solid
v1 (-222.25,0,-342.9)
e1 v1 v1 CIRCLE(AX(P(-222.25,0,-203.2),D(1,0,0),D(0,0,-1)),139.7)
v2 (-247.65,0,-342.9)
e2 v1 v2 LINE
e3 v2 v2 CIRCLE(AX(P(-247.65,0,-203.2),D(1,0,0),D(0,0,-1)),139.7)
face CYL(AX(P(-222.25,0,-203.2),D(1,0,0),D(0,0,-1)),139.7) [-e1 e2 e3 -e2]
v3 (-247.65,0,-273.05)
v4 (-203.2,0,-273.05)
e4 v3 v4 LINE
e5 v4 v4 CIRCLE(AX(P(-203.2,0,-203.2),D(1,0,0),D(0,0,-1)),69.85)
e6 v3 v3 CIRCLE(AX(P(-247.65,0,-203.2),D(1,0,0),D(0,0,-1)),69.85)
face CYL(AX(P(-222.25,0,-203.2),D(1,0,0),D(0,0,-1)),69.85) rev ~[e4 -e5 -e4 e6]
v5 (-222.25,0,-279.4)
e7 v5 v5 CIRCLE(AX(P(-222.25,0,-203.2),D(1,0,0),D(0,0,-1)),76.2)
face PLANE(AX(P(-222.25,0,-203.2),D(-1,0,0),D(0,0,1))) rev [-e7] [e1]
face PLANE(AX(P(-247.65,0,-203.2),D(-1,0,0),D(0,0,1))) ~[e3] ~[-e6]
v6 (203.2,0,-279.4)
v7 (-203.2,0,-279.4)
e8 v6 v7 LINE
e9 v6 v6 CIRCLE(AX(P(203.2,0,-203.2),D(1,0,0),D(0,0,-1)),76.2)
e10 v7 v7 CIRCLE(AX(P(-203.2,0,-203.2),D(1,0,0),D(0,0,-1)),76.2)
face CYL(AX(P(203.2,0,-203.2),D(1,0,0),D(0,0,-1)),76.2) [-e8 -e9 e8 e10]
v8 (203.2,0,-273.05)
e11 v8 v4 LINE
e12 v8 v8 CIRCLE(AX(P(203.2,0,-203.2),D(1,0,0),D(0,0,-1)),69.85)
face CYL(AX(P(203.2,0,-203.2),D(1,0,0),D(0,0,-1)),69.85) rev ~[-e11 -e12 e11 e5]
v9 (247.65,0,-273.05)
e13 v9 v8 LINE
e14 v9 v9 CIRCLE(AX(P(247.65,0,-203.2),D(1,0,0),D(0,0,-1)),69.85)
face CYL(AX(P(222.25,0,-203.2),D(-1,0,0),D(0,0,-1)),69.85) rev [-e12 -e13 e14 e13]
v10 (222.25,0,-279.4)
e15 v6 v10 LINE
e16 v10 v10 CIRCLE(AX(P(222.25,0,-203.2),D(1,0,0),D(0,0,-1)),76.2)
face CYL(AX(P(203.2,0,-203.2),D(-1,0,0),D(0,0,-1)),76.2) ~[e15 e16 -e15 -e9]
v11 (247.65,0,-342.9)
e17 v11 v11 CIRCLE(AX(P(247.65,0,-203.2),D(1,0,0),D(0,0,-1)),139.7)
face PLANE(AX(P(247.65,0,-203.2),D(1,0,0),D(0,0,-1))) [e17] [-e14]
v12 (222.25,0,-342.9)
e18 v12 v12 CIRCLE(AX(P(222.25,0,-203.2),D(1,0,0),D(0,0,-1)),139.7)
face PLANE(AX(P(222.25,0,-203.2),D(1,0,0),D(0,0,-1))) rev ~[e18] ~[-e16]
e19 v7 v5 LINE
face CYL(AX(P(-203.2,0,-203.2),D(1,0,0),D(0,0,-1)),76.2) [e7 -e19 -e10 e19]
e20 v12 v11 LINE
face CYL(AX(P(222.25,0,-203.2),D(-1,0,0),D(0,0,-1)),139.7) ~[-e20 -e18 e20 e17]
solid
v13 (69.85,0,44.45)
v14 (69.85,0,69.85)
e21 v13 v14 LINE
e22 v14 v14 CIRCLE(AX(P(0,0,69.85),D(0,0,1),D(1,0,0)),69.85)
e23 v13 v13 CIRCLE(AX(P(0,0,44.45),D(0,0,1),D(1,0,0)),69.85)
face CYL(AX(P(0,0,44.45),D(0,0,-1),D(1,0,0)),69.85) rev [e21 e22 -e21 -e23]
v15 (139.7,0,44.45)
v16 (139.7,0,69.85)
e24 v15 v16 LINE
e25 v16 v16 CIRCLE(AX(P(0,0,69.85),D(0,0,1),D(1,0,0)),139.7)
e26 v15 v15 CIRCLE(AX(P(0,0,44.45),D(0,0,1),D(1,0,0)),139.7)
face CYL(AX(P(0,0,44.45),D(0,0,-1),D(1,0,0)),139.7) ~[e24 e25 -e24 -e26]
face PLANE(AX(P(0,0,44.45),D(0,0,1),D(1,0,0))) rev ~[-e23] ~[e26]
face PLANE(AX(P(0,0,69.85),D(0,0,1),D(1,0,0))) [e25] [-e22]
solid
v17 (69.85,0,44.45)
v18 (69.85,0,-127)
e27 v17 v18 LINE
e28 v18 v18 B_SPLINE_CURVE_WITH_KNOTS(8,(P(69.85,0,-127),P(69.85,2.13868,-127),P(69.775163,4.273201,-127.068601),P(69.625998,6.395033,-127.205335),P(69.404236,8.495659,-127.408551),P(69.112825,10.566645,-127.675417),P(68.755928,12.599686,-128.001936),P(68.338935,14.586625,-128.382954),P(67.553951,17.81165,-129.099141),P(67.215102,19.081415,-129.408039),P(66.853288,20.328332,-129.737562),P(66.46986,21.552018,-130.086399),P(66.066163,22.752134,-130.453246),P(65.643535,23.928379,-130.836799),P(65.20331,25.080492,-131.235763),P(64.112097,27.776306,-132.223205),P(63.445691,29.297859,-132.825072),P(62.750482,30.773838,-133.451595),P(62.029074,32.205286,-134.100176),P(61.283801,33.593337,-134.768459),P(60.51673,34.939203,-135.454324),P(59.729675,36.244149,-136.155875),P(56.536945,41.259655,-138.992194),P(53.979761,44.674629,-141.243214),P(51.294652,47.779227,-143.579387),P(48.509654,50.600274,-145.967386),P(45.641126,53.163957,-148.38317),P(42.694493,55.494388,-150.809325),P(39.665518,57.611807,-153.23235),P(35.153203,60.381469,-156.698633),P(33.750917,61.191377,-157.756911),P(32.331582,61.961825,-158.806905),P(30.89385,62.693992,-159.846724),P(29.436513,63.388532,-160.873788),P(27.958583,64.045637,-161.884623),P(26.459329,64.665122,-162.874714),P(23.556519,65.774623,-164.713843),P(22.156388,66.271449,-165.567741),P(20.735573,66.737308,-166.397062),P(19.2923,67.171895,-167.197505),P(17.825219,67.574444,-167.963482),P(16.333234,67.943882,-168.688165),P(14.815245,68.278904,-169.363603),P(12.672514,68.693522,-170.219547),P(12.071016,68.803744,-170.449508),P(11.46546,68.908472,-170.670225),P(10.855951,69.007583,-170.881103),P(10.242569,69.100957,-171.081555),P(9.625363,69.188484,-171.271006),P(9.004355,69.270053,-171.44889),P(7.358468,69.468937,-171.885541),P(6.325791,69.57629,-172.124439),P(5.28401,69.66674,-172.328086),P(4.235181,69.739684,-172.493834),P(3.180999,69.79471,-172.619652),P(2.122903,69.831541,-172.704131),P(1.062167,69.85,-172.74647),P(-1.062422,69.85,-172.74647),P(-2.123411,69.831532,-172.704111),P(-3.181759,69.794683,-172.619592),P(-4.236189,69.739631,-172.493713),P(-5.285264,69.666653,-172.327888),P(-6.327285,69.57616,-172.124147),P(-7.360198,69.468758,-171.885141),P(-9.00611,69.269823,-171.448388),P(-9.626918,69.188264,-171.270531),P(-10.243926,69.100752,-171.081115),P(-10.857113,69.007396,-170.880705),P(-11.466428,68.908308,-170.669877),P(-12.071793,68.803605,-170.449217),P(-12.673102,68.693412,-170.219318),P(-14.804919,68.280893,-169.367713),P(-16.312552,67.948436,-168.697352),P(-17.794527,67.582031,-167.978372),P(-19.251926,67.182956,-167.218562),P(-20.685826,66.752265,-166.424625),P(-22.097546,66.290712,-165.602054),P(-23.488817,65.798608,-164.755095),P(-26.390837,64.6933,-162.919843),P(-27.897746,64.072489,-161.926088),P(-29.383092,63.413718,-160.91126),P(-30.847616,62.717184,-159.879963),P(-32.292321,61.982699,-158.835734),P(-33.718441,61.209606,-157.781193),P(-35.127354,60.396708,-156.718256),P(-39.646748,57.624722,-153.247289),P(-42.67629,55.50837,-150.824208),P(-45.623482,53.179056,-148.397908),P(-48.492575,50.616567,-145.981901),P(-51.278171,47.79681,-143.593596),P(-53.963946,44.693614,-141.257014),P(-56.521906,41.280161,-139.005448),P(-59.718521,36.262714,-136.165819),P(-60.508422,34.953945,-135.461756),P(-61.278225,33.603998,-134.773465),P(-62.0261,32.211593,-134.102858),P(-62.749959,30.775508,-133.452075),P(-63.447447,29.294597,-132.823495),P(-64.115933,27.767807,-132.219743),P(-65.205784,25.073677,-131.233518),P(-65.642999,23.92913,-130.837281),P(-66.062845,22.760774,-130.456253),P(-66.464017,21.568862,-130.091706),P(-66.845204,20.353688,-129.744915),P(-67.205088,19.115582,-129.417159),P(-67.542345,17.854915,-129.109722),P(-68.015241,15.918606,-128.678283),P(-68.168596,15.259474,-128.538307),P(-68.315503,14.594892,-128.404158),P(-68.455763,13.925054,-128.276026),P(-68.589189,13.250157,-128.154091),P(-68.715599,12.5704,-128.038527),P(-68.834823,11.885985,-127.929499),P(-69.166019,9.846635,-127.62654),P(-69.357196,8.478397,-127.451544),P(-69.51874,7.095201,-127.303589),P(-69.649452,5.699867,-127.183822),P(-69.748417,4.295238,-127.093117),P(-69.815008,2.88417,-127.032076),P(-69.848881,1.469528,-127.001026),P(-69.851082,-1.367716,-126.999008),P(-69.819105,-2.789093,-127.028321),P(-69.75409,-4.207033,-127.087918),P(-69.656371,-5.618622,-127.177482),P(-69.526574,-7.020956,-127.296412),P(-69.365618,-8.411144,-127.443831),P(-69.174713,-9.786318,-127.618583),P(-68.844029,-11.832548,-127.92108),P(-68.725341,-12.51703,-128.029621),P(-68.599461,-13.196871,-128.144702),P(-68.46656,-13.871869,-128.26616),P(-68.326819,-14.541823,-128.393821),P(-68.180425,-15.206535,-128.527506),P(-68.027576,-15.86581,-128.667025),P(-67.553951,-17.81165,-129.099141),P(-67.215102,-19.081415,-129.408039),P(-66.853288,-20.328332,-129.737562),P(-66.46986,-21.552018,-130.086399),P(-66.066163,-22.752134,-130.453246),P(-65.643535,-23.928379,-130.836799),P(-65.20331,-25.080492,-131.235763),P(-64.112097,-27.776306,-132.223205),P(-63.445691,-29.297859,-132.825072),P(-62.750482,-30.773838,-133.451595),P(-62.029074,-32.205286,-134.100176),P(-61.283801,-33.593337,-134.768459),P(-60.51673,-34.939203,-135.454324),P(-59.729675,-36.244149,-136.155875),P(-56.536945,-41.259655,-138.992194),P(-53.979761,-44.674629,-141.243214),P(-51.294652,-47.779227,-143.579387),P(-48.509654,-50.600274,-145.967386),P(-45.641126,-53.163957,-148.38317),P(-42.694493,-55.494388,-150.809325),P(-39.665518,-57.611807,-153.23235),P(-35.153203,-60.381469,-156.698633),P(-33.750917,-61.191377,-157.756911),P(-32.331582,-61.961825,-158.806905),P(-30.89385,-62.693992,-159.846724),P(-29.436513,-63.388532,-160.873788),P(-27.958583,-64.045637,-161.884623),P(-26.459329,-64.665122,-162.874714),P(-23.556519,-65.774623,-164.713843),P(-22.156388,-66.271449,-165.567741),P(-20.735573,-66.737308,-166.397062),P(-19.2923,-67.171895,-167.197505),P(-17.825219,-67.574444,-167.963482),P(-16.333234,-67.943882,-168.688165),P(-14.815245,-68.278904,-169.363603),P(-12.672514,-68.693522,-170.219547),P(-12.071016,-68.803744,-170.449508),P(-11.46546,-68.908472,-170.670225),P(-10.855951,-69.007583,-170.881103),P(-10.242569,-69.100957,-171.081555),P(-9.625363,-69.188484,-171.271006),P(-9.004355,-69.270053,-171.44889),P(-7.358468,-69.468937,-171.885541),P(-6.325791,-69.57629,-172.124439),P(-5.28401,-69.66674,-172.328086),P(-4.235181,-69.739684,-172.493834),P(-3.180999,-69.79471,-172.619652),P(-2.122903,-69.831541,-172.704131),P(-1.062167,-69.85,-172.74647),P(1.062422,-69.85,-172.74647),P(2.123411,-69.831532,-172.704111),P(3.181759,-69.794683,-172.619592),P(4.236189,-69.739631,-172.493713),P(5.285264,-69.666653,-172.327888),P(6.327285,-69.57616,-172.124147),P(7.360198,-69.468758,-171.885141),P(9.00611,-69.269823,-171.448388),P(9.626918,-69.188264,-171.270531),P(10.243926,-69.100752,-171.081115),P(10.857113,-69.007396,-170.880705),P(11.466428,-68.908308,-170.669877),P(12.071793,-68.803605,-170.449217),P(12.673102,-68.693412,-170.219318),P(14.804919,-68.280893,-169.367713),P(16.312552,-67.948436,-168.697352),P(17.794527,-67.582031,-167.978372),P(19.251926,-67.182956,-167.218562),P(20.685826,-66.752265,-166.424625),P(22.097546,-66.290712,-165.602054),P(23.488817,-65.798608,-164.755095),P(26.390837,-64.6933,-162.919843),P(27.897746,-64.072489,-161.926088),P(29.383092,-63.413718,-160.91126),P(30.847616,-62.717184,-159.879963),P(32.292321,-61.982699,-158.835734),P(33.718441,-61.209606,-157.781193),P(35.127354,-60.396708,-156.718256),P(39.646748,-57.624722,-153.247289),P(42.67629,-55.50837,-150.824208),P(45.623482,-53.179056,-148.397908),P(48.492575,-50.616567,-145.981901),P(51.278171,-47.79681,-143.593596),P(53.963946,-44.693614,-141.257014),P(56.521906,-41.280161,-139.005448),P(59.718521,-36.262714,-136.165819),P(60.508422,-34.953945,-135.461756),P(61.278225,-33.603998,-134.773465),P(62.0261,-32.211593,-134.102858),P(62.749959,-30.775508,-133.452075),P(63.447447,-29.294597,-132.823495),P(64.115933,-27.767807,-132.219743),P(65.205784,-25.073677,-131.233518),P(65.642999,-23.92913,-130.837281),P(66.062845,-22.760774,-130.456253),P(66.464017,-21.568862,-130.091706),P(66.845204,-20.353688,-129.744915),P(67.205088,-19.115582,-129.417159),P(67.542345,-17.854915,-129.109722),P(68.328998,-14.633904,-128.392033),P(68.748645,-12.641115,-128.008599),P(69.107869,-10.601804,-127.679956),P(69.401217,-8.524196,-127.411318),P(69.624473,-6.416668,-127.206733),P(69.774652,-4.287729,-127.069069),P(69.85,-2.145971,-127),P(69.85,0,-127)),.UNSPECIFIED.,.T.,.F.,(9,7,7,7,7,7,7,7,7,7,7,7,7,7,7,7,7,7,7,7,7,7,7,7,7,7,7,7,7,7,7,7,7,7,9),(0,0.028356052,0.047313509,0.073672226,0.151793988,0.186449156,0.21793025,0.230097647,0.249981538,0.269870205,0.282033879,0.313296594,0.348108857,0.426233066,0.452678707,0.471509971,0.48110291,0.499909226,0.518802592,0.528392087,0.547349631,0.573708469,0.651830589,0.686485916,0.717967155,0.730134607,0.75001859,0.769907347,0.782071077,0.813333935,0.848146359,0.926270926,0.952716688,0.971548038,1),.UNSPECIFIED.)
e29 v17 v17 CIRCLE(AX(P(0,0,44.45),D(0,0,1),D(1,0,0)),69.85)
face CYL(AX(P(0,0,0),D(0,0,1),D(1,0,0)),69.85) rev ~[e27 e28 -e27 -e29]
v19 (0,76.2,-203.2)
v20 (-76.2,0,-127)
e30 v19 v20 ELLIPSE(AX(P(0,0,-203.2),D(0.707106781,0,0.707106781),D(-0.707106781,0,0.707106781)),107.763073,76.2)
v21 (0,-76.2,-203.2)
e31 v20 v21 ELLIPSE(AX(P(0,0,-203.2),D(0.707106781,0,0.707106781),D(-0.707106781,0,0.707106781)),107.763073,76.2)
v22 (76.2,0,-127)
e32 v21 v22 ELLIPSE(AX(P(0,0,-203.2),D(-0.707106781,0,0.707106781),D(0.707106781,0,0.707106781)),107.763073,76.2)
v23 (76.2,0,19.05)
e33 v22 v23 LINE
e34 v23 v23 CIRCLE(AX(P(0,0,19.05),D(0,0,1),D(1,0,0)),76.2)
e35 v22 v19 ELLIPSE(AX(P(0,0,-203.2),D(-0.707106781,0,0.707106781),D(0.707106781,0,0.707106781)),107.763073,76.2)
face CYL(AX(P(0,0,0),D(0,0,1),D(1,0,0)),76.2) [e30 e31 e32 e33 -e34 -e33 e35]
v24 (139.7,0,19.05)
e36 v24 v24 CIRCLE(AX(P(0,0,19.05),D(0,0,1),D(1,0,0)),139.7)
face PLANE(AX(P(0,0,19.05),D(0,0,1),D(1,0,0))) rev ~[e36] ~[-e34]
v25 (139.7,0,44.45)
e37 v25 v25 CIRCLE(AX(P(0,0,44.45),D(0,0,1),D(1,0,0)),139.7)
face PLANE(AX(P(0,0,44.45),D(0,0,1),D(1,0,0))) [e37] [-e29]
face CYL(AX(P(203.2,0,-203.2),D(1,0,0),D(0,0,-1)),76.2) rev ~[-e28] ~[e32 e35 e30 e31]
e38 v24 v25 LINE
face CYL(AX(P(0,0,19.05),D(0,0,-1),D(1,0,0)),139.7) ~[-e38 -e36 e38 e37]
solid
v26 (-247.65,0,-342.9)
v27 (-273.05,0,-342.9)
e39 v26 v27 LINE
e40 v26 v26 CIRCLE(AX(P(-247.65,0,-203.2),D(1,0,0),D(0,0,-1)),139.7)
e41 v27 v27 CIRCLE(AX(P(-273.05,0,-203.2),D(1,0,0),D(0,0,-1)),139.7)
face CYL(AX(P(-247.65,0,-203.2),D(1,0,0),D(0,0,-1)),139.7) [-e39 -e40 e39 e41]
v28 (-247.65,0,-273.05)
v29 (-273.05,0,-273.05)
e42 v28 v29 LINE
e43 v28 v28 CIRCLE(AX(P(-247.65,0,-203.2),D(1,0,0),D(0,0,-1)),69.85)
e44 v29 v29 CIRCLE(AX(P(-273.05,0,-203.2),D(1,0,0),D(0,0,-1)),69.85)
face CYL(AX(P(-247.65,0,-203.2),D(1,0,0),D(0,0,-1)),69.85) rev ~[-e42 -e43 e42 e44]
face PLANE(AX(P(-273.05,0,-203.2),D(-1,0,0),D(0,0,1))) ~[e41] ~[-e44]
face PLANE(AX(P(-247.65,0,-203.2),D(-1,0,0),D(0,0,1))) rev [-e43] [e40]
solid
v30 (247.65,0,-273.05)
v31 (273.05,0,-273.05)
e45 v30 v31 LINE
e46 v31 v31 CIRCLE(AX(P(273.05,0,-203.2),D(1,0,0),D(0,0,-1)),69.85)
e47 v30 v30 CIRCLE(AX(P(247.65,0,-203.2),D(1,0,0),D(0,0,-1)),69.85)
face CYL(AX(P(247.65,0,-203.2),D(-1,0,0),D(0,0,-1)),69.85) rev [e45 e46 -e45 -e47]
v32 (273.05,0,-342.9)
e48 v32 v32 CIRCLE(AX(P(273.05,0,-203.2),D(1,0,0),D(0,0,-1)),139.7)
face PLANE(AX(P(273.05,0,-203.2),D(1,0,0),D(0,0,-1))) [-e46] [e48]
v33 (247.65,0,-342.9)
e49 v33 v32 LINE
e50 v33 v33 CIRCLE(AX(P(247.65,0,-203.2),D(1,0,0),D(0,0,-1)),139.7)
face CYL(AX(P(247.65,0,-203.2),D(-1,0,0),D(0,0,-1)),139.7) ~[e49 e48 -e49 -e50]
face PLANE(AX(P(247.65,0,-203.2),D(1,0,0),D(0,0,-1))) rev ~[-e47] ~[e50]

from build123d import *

# Parameters (mm, degrees)
F0_R      = 76.2
F0_R_2    = 69.85
F1_DEPTH  = 19.05
F2_R      = 139.7
F2_R_2    = 76.2
F2_R_3    = 69.85
F3_DEPTH  = 25.4
F9_ANGLE  = 90
F11_DEPTH = 406.4
F12_REACH = 558.4271469057
F13_DEPTH = 25.4
F14_DEPTH = 25.4
F15_DEPTH = 25.4


with BuildPart() as f1:
    # F0 (on Top) → F1 (new body)
    with BuildSketch(Plane.XY):
        Circle(F0_R)
        Circle(F0_R_2, mode=Mode.SUBTRACT)
    extrude(amount=F1_DEPTH)

    # F2 (on face) → F3 (join)
    with BuildSketch(Plane.XY.offset(19.05)):
        Circle(F2_R)
        Circle(F2_R_2, mode=Mode.SUBTRACT)
        Circle(F2_R_2)
        Circle(F2_R_3, mode=Mode.SUBTRACT)
    extrude(amount=F3_DEPTH)


with BuildPart() as f7_1:
    # F7: copy of F1
    add(f1.part.moved(Location((203.2, 0, -203.2))))


with BuildPart() as f7_1_1:
    # F9: moved
    add(f7_1.part.rotate(Axis((203.2, 122.1911609173, -203.2), (0, 1, 0)), F9_ANGLE))


with BuildPart() as f10_1:
    # F10: instance of F7_1
    add(f7_1_1.part.mirror(Plane.YZ))


with BuildPart() as f7_1_2:
    add(f7_1_1.part)

    # F11 (add, through all): a face of the model
    f11_faces = [f7_1_2.faces().sort_by_distance(p)[0] for p in [
        (203.2, 0, -129.1552614691),
    ]]

    add(f10_1.part)  # F11 merges F10_1
    extrude(f11_faces, amount=F11_DEPTH)


with BuildPart() as f1_1:
    add(f1.part)

    f12_end = f7_1_2.part.faces().sort_by_distance((0, 0, -127))[0]
    # F0 (on Top) → F12 (join, up to a face of F7_1 that its end follows)
    with BuildSketch(Plane.XY):
        Circle(F0_R)
        Circle(F0_R_2, mode=Mode.SUBTRACT)
    f12_long = extrude(amount=-F12_REACH, mode=Mode.PRIVATE)
    add(split(f12_long, bisect_by=f12_end, keep=Keep.ALL, mode=Mode.PRIVATE).solids().sort_by_distance((-74.0447385309, 0, 0))[0])


with BuildPart() as f13:
    # F13 (new): a face of the model
    f13_faces = [f1_1.part.faces().sort_by_distance(p)[0] for p in [
        (-135.7486873067, 0, 44.45),
    ]]
    extrude(f13_faces, amount=F13_DEPTH)


with BuildPart() as f14:
    # F14 (new): a face of the model
    f14_faces = [f7_1_2.part.faces().sort_by_distance(p)[0] for p in [
        (247.65, 0, -67.4513126933),
    ]]
    extrude(f14_faces, amount=F14_DEPTH)


with BuildPart() as f15:
    # F15 (new): a face of the model
    f15_faces = [f7_1_2.part.faces().sort_by_distance(p)[0] for p in [
        (-247.65, 0, -67.4513126933),
    ]]
    extrude(f15_faces, amount=F15_DEPTH)


solid = Compound([f7_1_2.part, f1_1.part, f13.part, f14.part, f15.part])
